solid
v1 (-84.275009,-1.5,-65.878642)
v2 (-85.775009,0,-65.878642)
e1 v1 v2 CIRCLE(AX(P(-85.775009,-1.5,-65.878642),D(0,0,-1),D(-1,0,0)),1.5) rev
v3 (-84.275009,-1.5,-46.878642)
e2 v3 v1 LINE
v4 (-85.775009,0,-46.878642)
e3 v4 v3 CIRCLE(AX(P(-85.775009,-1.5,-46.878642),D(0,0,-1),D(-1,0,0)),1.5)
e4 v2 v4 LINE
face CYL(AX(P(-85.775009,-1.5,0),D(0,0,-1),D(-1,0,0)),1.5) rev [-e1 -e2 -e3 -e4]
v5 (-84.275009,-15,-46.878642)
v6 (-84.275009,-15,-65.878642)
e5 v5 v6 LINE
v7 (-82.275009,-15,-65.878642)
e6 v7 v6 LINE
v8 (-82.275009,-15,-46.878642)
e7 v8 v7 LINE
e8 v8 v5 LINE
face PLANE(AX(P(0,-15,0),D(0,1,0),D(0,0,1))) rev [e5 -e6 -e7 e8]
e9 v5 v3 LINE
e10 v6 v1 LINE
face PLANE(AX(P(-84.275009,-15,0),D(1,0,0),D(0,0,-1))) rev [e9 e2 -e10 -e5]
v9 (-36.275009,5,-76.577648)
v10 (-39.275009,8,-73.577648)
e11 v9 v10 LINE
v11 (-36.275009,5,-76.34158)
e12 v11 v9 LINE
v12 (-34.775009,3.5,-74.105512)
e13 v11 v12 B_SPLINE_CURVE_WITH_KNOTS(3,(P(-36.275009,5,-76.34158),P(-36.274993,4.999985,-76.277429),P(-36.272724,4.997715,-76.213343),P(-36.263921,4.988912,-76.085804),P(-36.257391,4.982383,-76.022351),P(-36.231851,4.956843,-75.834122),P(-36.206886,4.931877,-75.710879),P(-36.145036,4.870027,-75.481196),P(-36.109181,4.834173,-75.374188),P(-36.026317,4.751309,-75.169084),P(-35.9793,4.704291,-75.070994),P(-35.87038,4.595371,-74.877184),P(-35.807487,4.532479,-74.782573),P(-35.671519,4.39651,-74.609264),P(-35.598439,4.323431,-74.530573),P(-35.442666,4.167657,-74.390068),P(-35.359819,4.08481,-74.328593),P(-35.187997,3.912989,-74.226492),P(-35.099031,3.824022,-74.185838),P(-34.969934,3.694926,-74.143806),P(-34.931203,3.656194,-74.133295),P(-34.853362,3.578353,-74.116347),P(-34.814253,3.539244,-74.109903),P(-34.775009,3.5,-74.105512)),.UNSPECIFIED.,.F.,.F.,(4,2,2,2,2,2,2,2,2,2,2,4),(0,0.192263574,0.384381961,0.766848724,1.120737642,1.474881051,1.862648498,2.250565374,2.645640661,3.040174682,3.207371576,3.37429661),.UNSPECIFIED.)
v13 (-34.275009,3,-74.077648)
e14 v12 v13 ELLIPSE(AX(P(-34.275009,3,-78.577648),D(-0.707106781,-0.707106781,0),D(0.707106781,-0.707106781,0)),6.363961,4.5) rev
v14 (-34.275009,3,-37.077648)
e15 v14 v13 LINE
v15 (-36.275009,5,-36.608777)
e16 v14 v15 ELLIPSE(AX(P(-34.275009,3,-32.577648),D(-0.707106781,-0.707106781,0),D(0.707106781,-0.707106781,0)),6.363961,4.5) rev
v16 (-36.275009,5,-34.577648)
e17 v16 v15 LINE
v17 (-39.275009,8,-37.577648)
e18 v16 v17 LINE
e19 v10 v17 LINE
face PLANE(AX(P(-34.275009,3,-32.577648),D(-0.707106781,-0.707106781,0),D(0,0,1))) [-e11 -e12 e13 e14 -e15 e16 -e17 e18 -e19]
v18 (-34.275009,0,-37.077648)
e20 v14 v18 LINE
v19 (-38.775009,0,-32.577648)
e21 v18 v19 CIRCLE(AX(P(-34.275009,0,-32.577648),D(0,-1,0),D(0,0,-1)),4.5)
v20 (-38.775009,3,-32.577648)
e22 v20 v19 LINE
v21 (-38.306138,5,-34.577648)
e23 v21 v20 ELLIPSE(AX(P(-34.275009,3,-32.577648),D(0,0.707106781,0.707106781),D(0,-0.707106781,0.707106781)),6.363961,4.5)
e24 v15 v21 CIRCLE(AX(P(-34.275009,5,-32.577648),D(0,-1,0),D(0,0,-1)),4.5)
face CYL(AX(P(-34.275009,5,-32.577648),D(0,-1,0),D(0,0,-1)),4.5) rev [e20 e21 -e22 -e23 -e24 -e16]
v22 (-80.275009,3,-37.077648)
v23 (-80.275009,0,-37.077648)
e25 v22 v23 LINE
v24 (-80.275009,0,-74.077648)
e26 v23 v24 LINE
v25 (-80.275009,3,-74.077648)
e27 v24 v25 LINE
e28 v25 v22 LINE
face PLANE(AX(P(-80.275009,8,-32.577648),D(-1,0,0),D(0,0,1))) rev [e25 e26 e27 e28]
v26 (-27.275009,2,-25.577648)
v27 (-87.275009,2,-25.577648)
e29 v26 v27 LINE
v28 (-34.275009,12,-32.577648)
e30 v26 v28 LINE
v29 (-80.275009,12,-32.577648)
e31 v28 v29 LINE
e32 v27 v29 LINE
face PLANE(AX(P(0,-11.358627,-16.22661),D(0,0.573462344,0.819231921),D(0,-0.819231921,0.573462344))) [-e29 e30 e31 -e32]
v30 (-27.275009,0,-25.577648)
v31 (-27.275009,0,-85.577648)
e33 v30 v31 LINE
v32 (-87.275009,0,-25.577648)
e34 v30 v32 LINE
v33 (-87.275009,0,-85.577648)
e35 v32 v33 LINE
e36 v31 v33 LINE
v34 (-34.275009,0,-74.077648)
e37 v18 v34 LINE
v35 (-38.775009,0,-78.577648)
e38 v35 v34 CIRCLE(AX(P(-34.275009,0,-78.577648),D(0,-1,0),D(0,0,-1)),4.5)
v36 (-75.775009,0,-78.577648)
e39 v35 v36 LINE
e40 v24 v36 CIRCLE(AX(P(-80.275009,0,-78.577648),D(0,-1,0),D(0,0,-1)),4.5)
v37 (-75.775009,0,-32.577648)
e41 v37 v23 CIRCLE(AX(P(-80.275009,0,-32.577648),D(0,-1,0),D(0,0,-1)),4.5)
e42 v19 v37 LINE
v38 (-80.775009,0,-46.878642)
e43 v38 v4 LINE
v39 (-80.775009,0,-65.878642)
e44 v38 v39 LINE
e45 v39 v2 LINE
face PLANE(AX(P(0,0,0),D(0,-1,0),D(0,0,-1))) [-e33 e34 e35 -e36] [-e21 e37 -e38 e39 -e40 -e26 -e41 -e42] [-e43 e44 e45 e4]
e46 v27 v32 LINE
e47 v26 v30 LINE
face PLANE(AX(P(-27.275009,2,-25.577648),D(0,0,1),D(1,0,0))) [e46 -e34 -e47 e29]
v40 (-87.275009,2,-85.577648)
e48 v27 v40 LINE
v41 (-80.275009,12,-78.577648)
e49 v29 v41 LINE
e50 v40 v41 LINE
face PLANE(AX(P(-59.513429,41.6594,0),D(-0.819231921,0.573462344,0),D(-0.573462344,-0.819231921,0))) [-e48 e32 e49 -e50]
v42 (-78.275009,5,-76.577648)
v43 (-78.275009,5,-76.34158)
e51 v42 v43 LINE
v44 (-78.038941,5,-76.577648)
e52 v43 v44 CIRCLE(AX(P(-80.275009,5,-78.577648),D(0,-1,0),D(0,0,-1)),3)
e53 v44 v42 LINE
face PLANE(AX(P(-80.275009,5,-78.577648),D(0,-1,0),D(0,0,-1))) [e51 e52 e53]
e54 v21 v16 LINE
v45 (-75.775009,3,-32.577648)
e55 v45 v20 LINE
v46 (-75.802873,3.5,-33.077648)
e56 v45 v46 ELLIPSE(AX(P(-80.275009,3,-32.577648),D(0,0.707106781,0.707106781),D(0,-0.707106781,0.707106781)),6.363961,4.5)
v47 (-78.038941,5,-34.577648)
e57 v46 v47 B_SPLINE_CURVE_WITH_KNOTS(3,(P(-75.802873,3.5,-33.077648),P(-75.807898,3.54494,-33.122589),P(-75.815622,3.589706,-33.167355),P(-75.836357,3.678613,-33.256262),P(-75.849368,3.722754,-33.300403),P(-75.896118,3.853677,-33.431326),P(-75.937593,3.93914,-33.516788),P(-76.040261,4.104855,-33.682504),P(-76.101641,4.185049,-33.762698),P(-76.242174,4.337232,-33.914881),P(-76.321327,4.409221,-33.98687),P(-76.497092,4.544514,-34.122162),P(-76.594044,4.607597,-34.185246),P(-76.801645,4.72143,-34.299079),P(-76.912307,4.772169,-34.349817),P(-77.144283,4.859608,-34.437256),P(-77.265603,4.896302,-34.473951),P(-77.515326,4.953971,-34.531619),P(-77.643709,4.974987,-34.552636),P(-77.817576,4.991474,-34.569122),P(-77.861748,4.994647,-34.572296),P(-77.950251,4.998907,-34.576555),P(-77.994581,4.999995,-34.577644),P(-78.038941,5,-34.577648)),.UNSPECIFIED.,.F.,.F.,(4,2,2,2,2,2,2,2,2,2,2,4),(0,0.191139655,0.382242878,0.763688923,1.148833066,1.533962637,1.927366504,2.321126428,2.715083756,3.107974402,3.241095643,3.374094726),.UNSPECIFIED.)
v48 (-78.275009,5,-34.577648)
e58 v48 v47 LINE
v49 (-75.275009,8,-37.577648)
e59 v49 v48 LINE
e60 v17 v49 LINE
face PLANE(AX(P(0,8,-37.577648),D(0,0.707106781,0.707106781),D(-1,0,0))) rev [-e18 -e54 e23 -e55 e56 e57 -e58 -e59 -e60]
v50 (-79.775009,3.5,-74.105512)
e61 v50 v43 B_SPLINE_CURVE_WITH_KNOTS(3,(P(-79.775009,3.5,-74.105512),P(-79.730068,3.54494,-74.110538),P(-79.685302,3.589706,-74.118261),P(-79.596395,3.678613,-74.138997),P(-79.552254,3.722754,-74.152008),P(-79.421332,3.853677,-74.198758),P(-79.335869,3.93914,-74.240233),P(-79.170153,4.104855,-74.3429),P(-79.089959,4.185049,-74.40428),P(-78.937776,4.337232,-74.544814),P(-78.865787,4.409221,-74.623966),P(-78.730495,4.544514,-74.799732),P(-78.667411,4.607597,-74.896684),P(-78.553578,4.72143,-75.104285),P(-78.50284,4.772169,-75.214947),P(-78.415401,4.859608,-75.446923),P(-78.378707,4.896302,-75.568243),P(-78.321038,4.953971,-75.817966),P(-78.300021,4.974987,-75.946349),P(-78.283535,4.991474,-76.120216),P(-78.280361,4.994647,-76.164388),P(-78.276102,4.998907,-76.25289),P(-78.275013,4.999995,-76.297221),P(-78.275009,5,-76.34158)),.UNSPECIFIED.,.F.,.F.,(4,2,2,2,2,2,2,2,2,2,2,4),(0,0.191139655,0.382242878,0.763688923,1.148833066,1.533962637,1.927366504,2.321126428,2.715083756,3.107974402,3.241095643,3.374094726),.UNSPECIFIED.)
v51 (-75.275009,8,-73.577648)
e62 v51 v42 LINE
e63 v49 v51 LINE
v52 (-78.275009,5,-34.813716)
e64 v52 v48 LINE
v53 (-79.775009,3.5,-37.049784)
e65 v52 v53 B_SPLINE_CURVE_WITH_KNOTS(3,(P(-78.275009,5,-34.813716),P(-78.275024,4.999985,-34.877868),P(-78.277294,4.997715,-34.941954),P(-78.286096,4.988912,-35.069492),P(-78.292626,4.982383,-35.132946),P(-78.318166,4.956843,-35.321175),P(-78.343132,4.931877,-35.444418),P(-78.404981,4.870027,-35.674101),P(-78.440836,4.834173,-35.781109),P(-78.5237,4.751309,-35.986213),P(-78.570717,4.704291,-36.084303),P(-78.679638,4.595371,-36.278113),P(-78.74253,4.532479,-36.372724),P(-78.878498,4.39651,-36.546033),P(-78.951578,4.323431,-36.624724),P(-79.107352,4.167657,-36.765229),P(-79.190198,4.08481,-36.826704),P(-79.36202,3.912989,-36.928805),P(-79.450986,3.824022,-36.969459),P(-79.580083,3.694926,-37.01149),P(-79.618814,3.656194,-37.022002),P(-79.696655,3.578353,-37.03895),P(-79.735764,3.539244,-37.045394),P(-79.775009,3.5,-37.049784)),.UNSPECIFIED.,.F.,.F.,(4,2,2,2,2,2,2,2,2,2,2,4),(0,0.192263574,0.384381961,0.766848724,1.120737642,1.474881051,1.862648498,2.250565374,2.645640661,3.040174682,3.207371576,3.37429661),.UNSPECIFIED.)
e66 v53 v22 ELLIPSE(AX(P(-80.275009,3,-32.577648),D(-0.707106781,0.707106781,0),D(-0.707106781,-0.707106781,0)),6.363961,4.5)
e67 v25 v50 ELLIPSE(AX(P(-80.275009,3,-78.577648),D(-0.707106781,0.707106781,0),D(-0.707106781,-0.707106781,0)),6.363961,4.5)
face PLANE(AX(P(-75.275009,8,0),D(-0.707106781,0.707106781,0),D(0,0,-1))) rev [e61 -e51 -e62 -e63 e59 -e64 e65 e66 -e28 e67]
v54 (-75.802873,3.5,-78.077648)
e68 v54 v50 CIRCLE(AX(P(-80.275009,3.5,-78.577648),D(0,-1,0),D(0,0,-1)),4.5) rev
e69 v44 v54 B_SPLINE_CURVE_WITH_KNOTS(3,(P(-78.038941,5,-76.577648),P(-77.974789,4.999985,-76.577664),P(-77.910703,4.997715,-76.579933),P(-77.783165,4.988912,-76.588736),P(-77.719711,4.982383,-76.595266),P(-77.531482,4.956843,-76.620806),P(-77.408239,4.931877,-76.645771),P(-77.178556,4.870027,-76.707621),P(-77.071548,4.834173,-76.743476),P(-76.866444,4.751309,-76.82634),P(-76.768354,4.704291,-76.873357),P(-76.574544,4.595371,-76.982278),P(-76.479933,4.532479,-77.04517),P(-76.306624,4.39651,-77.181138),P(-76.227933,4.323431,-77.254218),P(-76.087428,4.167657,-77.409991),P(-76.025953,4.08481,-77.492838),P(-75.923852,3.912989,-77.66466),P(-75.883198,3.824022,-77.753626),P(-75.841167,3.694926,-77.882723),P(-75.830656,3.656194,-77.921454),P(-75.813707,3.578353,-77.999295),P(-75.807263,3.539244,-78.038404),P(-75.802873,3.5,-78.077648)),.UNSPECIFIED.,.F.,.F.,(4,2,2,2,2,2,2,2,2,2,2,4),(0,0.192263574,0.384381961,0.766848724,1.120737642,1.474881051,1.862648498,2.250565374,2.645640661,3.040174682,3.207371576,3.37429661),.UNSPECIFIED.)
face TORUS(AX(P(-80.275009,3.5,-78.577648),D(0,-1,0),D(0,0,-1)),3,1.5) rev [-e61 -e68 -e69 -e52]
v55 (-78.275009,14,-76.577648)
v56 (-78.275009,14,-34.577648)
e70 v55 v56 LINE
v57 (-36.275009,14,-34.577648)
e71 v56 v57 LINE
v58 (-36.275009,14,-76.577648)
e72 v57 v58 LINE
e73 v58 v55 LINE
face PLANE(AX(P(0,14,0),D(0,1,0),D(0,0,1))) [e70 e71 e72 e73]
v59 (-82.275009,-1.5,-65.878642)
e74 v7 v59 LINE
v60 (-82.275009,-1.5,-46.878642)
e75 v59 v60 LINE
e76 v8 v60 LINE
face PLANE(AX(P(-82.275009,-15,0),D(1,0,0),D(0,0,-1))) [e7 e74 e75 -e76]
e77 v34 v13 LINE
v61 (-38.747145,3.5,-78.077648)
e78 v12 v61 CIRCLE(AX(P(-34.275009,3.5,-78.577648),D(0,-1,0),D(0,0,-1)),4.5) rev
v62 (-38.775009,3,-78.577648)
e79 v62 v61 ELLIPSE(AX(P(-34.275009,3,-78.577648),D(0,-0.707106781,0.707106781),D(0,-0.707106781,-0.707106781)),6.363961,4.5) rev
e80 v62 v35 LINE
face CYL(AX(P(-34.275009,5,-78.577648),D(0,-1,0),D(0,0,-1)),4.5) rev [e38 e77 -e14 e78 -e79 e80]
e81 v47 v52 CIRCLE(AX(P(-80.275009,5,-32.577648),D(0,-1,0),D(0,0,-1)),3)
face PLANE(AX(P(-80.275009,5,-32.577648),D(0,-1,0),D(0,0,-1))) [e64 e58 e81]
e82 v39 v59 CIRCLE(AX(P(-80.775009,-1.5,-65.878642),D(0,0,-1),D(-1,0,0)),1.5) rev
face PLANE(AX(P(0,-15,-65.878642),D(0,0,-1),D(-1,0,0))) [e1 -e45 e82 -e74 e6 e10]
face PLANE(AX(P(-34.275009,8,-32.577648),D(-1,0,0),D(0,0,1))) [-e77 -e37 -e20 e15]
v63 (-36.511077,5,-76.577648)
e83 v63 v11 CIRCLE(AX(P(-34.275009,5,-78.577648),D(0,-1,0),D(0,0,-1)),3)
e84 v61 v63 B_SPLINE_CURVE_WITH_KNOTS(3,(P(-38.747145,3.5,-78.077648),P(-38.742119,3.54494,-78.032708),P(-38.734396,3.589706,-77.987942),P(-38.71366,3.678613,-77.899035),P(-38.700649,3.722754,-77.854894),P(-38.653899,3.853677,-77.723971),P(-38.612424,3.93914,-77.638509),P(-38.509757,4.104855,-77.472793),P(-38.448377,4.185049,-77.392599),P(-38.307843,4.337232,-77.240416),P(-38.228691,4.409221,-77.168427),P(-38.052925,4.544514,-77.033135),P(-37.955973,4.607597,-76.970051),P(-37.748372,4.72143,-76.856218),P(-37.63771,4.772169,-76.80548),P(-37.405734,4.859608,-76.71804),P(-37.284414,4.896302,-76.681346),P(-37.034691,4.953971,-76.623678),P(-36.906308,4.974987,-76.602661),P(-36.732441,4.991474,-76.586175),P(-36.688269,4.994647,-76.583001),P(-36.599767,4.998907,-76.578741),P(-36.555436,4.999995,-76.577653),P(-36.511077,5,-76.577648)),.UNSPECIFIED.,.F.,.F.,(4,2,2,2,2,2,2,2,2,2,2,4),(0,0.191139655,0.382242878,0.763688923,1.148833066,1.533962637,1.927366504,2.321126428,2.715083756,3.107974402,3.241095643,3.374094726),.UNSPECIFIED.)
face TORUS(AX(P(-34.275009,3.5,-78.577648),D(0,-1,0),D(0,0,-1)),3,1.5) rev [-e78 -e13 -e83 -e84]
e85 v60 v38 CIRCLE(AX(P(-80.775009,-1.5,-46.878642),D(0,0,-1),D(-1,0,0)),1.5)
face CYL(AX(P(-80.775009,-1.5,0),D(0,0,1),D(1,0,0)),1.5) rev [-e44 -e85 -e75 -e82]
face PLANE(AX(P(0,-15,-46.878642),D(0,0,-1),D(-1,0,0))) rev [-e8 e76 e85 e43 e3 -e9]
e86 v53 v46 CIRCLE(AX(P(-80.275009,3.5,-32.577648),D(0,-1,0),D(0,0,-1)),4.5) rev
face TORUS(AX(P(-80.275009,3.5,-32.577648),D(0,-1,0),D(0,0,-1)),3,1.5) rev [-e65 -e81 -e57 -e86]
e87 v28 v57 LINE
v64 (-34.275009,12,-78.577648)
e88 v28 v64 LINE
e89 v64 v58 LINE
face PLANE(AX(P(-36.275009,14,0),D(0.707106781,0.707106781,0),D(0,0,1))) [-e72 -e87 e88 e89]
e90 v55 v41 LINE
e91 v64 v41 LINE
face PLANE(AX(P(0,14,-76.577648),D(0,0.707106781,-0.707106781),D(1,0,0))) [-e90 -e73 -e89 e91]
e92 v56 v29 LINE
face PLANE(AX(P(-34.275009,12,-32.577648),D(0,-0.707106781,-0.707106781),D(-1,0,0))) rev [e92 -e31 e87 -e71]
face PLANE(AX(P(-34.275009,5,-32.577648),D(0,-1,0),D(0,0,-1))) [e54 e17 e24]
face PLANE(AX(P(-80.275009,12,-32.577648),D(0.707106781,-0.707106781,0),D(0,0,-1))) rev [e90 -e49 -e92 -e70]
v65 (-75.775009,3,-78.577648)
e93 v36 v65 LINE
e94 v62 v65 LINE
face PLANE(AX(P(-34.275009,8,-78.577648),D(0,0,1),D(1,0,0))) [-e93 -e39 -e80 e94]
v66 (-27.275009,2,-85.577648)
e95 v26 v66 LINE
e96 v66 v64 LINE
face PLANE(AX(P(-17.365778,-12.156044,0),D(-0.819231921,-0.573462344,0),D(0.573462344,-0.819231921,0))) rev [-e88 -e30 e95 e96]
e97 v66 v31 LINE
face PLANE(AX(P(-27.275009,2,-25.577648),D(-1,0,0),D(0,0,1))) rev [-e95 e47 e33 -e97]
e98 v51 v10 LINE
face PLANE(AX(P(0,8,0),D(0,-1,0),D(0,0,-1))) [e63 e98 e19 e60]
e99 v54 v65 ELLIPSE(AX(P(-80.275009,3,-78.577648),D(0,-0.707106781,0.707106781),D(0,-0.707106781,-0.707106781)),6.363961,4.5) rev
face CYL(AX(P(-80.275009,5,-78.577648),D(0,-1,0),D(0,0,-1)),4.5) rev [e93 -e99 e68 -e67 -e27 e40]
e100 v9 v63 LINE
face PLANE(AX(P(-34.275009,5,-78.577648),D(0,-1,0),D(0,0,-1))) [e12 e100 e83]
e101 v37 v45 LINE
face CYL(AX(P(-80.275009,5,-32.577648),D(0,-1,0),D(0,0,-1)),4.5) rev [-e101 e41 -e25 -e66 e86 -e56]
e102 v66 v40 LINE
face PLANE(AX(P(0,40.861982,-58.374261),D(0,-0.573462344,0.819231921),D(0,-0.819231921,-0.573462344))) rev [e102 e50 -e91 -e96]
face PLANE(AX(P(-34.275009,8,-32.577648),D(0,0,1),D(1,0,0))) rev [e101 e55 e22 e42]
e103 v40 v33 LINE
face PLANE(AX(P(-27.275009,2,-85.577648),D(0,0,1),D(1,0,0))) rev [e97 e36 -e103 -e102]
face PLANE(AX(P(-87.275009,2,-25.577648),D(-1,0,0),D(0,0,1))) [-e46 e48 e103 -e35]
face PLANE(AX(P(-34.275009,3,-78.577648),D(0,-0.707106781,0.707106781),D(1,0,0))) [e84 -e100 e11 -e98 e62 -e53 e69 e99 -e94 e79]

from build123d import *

# Parameters (mm, degrees)
SKETCH1_W           = 60
SKETCH1_H           = 60
BOSS_EXTRUDE1_DEPTH = 2
BOSS_EXTRUDE2_START = -12
SKETCH1_18_W        = 46
SKETCH1_18_H        = 46
BOSS_EXTRUDE2_DEPTH = 2
CHAMFER1_SIZE       = 2
SKETCH1_19_W        = 46
SKETCH1_19_H        = 46
CUT_EXTRUDE4_DEPTH  = 8
CHAMFER2_SIZE       = 5
SKETCH1_21_R        = 4.5
CUT_EXTRUDE5_DEPTH  = 5
FILLET1_R           = 1.5
SKETCH1_22_W        = 2
SKETCH1_22_H        = 19
BOSS_EXTRUDE3_DEPTH = 15
FILLET2_R           = 1.5


with BuildPart() as part:
    # Sketch1 → Boss-Extrude1 (new body)
    with BuildSketch(Plane.XZ):
        with Locations((-57.275008644, -55.577648407)):
            Rectangle(SKETCH1_W, SKETCH1_H)
    extrude(amount=-BOSS_EXTRUDE1_DEPTH)



with BuildPart() as body_2:
    # Sketch1<18> → Boss-Extrude2 (new body)
    with BuildSketch(Plane.XZ.offset(BOSS_EXTRUDE2_START)):
        with Locations((-57.275008644, -55.577648407)):
            Rectangle(SKETCH1_18_W, SKETCH1_18_H)
    extrude(amount=-BOSS_EXTRUDE2_DEPTH)


with BuildPart() as part_1:
    add(part.part)

    add(body_2.part)  # loft1 joins it to this body
    # loft from a face of the part (loft1)
    loft([part_1.faces().sort_by_distance((-57.275008644, 2, -55.577648407))[0], part_1.faces().sort_by_distance((-57.275008644, 12, -55.577648407))[0]])

    # Chamfer1
    chamfer1_edges = [part_1.edges().sort_by_distance(p)[0] for p in [
        (-57.275008644, 14, -32.577648407),
        (-34.275008644, 14, -55.577648407),
        (-57.275008644, 14, -78.577648407),
        (-80.275008644, 14, -55.577648407),
    ]]
    chamfer(chamfer1_edges, length=CHAMFER1_SIZE - 0.0001)  # a hair under: the kernel refuses the full size

    # Sketch1<19> → Cut-Extrude4 (cut)
    with BuildSketch(Plane.XZ):
        with Locations((-57.275008644, -55.577648407)):
            Rectangle(SKETCH1_19_W, SKETCH1_19_H)
    extrude(amount=-CUT_EXTRUDE4_DEPTH, mode=Mode.SUBTRACT)

    # Chamfer2
    chamfer2_edges = [part_1.edges().sort_by_distance(p)[0] for p in [
        (-57.275008644, 8, -32.577648407),
        (-80.275008644, 8, -55.577648407),
        (-34.275008644, 8, -55.577648407),
        (-57.275008644, 8, -78.577648407),
    ]]
    chamfer(chamfer2_edges, length=CHAMFER2_SIZE)

    # Sketch1<21> → Cut-Extrude5 (cut)
    with BuildSketch(Plane.XZ):
        with Locations((-34.275008644, -32.577648407)):
            Circle(SKETCH1_21_R)
        with Locations((-80.275008644, -32.577648407)):
            Circle(SKETCH1_21_R)
        with Locations((-80.275008644, -78.577648407)):
            Circle(SKETCH1_21_R)
        with Locations((-34.275008644, -78.577648407)):
            Circle(SKETCH1_21_R)
    extrude(amount=-CUT_EXTRUDE5_DEPTH, mode=Mode.SUBTRACT)

    # Fillet1
    fillet1_edges = [part_1.edges().sort_by_distance(p)[0] for p in [
        (-83.45698916, 5, -81.759628922),
        (-83.45698916, 5, -29.395667891),
        (-31.093028129, 5, -81.759628922),
    ]]
    fillet(fillet1_edges, radius=FILLET1_R)

    # Sketch1<22> → Boss-Extrude3 (add)
    with BuildSketch(Plane.XZ):
        with Locations((-83.275008644, -56.378641634)):
            Rectangle(SKETCH1_22_W, SKETCH1_22_H)
    extrude(amount=BOSS_EXTRUDE3_DEPTH)

    # Fillet2
    fillet2_edges = [part_1.edges().sort_by_distance(p)[0] for p in [
        (-84.275008644, 0, -56.378641634),
        (-82.275008644, 0, -56.378641634),
    ]]
    fillet(fillet2_edges, radius=FILLET2_R)


solid = part_1.part
